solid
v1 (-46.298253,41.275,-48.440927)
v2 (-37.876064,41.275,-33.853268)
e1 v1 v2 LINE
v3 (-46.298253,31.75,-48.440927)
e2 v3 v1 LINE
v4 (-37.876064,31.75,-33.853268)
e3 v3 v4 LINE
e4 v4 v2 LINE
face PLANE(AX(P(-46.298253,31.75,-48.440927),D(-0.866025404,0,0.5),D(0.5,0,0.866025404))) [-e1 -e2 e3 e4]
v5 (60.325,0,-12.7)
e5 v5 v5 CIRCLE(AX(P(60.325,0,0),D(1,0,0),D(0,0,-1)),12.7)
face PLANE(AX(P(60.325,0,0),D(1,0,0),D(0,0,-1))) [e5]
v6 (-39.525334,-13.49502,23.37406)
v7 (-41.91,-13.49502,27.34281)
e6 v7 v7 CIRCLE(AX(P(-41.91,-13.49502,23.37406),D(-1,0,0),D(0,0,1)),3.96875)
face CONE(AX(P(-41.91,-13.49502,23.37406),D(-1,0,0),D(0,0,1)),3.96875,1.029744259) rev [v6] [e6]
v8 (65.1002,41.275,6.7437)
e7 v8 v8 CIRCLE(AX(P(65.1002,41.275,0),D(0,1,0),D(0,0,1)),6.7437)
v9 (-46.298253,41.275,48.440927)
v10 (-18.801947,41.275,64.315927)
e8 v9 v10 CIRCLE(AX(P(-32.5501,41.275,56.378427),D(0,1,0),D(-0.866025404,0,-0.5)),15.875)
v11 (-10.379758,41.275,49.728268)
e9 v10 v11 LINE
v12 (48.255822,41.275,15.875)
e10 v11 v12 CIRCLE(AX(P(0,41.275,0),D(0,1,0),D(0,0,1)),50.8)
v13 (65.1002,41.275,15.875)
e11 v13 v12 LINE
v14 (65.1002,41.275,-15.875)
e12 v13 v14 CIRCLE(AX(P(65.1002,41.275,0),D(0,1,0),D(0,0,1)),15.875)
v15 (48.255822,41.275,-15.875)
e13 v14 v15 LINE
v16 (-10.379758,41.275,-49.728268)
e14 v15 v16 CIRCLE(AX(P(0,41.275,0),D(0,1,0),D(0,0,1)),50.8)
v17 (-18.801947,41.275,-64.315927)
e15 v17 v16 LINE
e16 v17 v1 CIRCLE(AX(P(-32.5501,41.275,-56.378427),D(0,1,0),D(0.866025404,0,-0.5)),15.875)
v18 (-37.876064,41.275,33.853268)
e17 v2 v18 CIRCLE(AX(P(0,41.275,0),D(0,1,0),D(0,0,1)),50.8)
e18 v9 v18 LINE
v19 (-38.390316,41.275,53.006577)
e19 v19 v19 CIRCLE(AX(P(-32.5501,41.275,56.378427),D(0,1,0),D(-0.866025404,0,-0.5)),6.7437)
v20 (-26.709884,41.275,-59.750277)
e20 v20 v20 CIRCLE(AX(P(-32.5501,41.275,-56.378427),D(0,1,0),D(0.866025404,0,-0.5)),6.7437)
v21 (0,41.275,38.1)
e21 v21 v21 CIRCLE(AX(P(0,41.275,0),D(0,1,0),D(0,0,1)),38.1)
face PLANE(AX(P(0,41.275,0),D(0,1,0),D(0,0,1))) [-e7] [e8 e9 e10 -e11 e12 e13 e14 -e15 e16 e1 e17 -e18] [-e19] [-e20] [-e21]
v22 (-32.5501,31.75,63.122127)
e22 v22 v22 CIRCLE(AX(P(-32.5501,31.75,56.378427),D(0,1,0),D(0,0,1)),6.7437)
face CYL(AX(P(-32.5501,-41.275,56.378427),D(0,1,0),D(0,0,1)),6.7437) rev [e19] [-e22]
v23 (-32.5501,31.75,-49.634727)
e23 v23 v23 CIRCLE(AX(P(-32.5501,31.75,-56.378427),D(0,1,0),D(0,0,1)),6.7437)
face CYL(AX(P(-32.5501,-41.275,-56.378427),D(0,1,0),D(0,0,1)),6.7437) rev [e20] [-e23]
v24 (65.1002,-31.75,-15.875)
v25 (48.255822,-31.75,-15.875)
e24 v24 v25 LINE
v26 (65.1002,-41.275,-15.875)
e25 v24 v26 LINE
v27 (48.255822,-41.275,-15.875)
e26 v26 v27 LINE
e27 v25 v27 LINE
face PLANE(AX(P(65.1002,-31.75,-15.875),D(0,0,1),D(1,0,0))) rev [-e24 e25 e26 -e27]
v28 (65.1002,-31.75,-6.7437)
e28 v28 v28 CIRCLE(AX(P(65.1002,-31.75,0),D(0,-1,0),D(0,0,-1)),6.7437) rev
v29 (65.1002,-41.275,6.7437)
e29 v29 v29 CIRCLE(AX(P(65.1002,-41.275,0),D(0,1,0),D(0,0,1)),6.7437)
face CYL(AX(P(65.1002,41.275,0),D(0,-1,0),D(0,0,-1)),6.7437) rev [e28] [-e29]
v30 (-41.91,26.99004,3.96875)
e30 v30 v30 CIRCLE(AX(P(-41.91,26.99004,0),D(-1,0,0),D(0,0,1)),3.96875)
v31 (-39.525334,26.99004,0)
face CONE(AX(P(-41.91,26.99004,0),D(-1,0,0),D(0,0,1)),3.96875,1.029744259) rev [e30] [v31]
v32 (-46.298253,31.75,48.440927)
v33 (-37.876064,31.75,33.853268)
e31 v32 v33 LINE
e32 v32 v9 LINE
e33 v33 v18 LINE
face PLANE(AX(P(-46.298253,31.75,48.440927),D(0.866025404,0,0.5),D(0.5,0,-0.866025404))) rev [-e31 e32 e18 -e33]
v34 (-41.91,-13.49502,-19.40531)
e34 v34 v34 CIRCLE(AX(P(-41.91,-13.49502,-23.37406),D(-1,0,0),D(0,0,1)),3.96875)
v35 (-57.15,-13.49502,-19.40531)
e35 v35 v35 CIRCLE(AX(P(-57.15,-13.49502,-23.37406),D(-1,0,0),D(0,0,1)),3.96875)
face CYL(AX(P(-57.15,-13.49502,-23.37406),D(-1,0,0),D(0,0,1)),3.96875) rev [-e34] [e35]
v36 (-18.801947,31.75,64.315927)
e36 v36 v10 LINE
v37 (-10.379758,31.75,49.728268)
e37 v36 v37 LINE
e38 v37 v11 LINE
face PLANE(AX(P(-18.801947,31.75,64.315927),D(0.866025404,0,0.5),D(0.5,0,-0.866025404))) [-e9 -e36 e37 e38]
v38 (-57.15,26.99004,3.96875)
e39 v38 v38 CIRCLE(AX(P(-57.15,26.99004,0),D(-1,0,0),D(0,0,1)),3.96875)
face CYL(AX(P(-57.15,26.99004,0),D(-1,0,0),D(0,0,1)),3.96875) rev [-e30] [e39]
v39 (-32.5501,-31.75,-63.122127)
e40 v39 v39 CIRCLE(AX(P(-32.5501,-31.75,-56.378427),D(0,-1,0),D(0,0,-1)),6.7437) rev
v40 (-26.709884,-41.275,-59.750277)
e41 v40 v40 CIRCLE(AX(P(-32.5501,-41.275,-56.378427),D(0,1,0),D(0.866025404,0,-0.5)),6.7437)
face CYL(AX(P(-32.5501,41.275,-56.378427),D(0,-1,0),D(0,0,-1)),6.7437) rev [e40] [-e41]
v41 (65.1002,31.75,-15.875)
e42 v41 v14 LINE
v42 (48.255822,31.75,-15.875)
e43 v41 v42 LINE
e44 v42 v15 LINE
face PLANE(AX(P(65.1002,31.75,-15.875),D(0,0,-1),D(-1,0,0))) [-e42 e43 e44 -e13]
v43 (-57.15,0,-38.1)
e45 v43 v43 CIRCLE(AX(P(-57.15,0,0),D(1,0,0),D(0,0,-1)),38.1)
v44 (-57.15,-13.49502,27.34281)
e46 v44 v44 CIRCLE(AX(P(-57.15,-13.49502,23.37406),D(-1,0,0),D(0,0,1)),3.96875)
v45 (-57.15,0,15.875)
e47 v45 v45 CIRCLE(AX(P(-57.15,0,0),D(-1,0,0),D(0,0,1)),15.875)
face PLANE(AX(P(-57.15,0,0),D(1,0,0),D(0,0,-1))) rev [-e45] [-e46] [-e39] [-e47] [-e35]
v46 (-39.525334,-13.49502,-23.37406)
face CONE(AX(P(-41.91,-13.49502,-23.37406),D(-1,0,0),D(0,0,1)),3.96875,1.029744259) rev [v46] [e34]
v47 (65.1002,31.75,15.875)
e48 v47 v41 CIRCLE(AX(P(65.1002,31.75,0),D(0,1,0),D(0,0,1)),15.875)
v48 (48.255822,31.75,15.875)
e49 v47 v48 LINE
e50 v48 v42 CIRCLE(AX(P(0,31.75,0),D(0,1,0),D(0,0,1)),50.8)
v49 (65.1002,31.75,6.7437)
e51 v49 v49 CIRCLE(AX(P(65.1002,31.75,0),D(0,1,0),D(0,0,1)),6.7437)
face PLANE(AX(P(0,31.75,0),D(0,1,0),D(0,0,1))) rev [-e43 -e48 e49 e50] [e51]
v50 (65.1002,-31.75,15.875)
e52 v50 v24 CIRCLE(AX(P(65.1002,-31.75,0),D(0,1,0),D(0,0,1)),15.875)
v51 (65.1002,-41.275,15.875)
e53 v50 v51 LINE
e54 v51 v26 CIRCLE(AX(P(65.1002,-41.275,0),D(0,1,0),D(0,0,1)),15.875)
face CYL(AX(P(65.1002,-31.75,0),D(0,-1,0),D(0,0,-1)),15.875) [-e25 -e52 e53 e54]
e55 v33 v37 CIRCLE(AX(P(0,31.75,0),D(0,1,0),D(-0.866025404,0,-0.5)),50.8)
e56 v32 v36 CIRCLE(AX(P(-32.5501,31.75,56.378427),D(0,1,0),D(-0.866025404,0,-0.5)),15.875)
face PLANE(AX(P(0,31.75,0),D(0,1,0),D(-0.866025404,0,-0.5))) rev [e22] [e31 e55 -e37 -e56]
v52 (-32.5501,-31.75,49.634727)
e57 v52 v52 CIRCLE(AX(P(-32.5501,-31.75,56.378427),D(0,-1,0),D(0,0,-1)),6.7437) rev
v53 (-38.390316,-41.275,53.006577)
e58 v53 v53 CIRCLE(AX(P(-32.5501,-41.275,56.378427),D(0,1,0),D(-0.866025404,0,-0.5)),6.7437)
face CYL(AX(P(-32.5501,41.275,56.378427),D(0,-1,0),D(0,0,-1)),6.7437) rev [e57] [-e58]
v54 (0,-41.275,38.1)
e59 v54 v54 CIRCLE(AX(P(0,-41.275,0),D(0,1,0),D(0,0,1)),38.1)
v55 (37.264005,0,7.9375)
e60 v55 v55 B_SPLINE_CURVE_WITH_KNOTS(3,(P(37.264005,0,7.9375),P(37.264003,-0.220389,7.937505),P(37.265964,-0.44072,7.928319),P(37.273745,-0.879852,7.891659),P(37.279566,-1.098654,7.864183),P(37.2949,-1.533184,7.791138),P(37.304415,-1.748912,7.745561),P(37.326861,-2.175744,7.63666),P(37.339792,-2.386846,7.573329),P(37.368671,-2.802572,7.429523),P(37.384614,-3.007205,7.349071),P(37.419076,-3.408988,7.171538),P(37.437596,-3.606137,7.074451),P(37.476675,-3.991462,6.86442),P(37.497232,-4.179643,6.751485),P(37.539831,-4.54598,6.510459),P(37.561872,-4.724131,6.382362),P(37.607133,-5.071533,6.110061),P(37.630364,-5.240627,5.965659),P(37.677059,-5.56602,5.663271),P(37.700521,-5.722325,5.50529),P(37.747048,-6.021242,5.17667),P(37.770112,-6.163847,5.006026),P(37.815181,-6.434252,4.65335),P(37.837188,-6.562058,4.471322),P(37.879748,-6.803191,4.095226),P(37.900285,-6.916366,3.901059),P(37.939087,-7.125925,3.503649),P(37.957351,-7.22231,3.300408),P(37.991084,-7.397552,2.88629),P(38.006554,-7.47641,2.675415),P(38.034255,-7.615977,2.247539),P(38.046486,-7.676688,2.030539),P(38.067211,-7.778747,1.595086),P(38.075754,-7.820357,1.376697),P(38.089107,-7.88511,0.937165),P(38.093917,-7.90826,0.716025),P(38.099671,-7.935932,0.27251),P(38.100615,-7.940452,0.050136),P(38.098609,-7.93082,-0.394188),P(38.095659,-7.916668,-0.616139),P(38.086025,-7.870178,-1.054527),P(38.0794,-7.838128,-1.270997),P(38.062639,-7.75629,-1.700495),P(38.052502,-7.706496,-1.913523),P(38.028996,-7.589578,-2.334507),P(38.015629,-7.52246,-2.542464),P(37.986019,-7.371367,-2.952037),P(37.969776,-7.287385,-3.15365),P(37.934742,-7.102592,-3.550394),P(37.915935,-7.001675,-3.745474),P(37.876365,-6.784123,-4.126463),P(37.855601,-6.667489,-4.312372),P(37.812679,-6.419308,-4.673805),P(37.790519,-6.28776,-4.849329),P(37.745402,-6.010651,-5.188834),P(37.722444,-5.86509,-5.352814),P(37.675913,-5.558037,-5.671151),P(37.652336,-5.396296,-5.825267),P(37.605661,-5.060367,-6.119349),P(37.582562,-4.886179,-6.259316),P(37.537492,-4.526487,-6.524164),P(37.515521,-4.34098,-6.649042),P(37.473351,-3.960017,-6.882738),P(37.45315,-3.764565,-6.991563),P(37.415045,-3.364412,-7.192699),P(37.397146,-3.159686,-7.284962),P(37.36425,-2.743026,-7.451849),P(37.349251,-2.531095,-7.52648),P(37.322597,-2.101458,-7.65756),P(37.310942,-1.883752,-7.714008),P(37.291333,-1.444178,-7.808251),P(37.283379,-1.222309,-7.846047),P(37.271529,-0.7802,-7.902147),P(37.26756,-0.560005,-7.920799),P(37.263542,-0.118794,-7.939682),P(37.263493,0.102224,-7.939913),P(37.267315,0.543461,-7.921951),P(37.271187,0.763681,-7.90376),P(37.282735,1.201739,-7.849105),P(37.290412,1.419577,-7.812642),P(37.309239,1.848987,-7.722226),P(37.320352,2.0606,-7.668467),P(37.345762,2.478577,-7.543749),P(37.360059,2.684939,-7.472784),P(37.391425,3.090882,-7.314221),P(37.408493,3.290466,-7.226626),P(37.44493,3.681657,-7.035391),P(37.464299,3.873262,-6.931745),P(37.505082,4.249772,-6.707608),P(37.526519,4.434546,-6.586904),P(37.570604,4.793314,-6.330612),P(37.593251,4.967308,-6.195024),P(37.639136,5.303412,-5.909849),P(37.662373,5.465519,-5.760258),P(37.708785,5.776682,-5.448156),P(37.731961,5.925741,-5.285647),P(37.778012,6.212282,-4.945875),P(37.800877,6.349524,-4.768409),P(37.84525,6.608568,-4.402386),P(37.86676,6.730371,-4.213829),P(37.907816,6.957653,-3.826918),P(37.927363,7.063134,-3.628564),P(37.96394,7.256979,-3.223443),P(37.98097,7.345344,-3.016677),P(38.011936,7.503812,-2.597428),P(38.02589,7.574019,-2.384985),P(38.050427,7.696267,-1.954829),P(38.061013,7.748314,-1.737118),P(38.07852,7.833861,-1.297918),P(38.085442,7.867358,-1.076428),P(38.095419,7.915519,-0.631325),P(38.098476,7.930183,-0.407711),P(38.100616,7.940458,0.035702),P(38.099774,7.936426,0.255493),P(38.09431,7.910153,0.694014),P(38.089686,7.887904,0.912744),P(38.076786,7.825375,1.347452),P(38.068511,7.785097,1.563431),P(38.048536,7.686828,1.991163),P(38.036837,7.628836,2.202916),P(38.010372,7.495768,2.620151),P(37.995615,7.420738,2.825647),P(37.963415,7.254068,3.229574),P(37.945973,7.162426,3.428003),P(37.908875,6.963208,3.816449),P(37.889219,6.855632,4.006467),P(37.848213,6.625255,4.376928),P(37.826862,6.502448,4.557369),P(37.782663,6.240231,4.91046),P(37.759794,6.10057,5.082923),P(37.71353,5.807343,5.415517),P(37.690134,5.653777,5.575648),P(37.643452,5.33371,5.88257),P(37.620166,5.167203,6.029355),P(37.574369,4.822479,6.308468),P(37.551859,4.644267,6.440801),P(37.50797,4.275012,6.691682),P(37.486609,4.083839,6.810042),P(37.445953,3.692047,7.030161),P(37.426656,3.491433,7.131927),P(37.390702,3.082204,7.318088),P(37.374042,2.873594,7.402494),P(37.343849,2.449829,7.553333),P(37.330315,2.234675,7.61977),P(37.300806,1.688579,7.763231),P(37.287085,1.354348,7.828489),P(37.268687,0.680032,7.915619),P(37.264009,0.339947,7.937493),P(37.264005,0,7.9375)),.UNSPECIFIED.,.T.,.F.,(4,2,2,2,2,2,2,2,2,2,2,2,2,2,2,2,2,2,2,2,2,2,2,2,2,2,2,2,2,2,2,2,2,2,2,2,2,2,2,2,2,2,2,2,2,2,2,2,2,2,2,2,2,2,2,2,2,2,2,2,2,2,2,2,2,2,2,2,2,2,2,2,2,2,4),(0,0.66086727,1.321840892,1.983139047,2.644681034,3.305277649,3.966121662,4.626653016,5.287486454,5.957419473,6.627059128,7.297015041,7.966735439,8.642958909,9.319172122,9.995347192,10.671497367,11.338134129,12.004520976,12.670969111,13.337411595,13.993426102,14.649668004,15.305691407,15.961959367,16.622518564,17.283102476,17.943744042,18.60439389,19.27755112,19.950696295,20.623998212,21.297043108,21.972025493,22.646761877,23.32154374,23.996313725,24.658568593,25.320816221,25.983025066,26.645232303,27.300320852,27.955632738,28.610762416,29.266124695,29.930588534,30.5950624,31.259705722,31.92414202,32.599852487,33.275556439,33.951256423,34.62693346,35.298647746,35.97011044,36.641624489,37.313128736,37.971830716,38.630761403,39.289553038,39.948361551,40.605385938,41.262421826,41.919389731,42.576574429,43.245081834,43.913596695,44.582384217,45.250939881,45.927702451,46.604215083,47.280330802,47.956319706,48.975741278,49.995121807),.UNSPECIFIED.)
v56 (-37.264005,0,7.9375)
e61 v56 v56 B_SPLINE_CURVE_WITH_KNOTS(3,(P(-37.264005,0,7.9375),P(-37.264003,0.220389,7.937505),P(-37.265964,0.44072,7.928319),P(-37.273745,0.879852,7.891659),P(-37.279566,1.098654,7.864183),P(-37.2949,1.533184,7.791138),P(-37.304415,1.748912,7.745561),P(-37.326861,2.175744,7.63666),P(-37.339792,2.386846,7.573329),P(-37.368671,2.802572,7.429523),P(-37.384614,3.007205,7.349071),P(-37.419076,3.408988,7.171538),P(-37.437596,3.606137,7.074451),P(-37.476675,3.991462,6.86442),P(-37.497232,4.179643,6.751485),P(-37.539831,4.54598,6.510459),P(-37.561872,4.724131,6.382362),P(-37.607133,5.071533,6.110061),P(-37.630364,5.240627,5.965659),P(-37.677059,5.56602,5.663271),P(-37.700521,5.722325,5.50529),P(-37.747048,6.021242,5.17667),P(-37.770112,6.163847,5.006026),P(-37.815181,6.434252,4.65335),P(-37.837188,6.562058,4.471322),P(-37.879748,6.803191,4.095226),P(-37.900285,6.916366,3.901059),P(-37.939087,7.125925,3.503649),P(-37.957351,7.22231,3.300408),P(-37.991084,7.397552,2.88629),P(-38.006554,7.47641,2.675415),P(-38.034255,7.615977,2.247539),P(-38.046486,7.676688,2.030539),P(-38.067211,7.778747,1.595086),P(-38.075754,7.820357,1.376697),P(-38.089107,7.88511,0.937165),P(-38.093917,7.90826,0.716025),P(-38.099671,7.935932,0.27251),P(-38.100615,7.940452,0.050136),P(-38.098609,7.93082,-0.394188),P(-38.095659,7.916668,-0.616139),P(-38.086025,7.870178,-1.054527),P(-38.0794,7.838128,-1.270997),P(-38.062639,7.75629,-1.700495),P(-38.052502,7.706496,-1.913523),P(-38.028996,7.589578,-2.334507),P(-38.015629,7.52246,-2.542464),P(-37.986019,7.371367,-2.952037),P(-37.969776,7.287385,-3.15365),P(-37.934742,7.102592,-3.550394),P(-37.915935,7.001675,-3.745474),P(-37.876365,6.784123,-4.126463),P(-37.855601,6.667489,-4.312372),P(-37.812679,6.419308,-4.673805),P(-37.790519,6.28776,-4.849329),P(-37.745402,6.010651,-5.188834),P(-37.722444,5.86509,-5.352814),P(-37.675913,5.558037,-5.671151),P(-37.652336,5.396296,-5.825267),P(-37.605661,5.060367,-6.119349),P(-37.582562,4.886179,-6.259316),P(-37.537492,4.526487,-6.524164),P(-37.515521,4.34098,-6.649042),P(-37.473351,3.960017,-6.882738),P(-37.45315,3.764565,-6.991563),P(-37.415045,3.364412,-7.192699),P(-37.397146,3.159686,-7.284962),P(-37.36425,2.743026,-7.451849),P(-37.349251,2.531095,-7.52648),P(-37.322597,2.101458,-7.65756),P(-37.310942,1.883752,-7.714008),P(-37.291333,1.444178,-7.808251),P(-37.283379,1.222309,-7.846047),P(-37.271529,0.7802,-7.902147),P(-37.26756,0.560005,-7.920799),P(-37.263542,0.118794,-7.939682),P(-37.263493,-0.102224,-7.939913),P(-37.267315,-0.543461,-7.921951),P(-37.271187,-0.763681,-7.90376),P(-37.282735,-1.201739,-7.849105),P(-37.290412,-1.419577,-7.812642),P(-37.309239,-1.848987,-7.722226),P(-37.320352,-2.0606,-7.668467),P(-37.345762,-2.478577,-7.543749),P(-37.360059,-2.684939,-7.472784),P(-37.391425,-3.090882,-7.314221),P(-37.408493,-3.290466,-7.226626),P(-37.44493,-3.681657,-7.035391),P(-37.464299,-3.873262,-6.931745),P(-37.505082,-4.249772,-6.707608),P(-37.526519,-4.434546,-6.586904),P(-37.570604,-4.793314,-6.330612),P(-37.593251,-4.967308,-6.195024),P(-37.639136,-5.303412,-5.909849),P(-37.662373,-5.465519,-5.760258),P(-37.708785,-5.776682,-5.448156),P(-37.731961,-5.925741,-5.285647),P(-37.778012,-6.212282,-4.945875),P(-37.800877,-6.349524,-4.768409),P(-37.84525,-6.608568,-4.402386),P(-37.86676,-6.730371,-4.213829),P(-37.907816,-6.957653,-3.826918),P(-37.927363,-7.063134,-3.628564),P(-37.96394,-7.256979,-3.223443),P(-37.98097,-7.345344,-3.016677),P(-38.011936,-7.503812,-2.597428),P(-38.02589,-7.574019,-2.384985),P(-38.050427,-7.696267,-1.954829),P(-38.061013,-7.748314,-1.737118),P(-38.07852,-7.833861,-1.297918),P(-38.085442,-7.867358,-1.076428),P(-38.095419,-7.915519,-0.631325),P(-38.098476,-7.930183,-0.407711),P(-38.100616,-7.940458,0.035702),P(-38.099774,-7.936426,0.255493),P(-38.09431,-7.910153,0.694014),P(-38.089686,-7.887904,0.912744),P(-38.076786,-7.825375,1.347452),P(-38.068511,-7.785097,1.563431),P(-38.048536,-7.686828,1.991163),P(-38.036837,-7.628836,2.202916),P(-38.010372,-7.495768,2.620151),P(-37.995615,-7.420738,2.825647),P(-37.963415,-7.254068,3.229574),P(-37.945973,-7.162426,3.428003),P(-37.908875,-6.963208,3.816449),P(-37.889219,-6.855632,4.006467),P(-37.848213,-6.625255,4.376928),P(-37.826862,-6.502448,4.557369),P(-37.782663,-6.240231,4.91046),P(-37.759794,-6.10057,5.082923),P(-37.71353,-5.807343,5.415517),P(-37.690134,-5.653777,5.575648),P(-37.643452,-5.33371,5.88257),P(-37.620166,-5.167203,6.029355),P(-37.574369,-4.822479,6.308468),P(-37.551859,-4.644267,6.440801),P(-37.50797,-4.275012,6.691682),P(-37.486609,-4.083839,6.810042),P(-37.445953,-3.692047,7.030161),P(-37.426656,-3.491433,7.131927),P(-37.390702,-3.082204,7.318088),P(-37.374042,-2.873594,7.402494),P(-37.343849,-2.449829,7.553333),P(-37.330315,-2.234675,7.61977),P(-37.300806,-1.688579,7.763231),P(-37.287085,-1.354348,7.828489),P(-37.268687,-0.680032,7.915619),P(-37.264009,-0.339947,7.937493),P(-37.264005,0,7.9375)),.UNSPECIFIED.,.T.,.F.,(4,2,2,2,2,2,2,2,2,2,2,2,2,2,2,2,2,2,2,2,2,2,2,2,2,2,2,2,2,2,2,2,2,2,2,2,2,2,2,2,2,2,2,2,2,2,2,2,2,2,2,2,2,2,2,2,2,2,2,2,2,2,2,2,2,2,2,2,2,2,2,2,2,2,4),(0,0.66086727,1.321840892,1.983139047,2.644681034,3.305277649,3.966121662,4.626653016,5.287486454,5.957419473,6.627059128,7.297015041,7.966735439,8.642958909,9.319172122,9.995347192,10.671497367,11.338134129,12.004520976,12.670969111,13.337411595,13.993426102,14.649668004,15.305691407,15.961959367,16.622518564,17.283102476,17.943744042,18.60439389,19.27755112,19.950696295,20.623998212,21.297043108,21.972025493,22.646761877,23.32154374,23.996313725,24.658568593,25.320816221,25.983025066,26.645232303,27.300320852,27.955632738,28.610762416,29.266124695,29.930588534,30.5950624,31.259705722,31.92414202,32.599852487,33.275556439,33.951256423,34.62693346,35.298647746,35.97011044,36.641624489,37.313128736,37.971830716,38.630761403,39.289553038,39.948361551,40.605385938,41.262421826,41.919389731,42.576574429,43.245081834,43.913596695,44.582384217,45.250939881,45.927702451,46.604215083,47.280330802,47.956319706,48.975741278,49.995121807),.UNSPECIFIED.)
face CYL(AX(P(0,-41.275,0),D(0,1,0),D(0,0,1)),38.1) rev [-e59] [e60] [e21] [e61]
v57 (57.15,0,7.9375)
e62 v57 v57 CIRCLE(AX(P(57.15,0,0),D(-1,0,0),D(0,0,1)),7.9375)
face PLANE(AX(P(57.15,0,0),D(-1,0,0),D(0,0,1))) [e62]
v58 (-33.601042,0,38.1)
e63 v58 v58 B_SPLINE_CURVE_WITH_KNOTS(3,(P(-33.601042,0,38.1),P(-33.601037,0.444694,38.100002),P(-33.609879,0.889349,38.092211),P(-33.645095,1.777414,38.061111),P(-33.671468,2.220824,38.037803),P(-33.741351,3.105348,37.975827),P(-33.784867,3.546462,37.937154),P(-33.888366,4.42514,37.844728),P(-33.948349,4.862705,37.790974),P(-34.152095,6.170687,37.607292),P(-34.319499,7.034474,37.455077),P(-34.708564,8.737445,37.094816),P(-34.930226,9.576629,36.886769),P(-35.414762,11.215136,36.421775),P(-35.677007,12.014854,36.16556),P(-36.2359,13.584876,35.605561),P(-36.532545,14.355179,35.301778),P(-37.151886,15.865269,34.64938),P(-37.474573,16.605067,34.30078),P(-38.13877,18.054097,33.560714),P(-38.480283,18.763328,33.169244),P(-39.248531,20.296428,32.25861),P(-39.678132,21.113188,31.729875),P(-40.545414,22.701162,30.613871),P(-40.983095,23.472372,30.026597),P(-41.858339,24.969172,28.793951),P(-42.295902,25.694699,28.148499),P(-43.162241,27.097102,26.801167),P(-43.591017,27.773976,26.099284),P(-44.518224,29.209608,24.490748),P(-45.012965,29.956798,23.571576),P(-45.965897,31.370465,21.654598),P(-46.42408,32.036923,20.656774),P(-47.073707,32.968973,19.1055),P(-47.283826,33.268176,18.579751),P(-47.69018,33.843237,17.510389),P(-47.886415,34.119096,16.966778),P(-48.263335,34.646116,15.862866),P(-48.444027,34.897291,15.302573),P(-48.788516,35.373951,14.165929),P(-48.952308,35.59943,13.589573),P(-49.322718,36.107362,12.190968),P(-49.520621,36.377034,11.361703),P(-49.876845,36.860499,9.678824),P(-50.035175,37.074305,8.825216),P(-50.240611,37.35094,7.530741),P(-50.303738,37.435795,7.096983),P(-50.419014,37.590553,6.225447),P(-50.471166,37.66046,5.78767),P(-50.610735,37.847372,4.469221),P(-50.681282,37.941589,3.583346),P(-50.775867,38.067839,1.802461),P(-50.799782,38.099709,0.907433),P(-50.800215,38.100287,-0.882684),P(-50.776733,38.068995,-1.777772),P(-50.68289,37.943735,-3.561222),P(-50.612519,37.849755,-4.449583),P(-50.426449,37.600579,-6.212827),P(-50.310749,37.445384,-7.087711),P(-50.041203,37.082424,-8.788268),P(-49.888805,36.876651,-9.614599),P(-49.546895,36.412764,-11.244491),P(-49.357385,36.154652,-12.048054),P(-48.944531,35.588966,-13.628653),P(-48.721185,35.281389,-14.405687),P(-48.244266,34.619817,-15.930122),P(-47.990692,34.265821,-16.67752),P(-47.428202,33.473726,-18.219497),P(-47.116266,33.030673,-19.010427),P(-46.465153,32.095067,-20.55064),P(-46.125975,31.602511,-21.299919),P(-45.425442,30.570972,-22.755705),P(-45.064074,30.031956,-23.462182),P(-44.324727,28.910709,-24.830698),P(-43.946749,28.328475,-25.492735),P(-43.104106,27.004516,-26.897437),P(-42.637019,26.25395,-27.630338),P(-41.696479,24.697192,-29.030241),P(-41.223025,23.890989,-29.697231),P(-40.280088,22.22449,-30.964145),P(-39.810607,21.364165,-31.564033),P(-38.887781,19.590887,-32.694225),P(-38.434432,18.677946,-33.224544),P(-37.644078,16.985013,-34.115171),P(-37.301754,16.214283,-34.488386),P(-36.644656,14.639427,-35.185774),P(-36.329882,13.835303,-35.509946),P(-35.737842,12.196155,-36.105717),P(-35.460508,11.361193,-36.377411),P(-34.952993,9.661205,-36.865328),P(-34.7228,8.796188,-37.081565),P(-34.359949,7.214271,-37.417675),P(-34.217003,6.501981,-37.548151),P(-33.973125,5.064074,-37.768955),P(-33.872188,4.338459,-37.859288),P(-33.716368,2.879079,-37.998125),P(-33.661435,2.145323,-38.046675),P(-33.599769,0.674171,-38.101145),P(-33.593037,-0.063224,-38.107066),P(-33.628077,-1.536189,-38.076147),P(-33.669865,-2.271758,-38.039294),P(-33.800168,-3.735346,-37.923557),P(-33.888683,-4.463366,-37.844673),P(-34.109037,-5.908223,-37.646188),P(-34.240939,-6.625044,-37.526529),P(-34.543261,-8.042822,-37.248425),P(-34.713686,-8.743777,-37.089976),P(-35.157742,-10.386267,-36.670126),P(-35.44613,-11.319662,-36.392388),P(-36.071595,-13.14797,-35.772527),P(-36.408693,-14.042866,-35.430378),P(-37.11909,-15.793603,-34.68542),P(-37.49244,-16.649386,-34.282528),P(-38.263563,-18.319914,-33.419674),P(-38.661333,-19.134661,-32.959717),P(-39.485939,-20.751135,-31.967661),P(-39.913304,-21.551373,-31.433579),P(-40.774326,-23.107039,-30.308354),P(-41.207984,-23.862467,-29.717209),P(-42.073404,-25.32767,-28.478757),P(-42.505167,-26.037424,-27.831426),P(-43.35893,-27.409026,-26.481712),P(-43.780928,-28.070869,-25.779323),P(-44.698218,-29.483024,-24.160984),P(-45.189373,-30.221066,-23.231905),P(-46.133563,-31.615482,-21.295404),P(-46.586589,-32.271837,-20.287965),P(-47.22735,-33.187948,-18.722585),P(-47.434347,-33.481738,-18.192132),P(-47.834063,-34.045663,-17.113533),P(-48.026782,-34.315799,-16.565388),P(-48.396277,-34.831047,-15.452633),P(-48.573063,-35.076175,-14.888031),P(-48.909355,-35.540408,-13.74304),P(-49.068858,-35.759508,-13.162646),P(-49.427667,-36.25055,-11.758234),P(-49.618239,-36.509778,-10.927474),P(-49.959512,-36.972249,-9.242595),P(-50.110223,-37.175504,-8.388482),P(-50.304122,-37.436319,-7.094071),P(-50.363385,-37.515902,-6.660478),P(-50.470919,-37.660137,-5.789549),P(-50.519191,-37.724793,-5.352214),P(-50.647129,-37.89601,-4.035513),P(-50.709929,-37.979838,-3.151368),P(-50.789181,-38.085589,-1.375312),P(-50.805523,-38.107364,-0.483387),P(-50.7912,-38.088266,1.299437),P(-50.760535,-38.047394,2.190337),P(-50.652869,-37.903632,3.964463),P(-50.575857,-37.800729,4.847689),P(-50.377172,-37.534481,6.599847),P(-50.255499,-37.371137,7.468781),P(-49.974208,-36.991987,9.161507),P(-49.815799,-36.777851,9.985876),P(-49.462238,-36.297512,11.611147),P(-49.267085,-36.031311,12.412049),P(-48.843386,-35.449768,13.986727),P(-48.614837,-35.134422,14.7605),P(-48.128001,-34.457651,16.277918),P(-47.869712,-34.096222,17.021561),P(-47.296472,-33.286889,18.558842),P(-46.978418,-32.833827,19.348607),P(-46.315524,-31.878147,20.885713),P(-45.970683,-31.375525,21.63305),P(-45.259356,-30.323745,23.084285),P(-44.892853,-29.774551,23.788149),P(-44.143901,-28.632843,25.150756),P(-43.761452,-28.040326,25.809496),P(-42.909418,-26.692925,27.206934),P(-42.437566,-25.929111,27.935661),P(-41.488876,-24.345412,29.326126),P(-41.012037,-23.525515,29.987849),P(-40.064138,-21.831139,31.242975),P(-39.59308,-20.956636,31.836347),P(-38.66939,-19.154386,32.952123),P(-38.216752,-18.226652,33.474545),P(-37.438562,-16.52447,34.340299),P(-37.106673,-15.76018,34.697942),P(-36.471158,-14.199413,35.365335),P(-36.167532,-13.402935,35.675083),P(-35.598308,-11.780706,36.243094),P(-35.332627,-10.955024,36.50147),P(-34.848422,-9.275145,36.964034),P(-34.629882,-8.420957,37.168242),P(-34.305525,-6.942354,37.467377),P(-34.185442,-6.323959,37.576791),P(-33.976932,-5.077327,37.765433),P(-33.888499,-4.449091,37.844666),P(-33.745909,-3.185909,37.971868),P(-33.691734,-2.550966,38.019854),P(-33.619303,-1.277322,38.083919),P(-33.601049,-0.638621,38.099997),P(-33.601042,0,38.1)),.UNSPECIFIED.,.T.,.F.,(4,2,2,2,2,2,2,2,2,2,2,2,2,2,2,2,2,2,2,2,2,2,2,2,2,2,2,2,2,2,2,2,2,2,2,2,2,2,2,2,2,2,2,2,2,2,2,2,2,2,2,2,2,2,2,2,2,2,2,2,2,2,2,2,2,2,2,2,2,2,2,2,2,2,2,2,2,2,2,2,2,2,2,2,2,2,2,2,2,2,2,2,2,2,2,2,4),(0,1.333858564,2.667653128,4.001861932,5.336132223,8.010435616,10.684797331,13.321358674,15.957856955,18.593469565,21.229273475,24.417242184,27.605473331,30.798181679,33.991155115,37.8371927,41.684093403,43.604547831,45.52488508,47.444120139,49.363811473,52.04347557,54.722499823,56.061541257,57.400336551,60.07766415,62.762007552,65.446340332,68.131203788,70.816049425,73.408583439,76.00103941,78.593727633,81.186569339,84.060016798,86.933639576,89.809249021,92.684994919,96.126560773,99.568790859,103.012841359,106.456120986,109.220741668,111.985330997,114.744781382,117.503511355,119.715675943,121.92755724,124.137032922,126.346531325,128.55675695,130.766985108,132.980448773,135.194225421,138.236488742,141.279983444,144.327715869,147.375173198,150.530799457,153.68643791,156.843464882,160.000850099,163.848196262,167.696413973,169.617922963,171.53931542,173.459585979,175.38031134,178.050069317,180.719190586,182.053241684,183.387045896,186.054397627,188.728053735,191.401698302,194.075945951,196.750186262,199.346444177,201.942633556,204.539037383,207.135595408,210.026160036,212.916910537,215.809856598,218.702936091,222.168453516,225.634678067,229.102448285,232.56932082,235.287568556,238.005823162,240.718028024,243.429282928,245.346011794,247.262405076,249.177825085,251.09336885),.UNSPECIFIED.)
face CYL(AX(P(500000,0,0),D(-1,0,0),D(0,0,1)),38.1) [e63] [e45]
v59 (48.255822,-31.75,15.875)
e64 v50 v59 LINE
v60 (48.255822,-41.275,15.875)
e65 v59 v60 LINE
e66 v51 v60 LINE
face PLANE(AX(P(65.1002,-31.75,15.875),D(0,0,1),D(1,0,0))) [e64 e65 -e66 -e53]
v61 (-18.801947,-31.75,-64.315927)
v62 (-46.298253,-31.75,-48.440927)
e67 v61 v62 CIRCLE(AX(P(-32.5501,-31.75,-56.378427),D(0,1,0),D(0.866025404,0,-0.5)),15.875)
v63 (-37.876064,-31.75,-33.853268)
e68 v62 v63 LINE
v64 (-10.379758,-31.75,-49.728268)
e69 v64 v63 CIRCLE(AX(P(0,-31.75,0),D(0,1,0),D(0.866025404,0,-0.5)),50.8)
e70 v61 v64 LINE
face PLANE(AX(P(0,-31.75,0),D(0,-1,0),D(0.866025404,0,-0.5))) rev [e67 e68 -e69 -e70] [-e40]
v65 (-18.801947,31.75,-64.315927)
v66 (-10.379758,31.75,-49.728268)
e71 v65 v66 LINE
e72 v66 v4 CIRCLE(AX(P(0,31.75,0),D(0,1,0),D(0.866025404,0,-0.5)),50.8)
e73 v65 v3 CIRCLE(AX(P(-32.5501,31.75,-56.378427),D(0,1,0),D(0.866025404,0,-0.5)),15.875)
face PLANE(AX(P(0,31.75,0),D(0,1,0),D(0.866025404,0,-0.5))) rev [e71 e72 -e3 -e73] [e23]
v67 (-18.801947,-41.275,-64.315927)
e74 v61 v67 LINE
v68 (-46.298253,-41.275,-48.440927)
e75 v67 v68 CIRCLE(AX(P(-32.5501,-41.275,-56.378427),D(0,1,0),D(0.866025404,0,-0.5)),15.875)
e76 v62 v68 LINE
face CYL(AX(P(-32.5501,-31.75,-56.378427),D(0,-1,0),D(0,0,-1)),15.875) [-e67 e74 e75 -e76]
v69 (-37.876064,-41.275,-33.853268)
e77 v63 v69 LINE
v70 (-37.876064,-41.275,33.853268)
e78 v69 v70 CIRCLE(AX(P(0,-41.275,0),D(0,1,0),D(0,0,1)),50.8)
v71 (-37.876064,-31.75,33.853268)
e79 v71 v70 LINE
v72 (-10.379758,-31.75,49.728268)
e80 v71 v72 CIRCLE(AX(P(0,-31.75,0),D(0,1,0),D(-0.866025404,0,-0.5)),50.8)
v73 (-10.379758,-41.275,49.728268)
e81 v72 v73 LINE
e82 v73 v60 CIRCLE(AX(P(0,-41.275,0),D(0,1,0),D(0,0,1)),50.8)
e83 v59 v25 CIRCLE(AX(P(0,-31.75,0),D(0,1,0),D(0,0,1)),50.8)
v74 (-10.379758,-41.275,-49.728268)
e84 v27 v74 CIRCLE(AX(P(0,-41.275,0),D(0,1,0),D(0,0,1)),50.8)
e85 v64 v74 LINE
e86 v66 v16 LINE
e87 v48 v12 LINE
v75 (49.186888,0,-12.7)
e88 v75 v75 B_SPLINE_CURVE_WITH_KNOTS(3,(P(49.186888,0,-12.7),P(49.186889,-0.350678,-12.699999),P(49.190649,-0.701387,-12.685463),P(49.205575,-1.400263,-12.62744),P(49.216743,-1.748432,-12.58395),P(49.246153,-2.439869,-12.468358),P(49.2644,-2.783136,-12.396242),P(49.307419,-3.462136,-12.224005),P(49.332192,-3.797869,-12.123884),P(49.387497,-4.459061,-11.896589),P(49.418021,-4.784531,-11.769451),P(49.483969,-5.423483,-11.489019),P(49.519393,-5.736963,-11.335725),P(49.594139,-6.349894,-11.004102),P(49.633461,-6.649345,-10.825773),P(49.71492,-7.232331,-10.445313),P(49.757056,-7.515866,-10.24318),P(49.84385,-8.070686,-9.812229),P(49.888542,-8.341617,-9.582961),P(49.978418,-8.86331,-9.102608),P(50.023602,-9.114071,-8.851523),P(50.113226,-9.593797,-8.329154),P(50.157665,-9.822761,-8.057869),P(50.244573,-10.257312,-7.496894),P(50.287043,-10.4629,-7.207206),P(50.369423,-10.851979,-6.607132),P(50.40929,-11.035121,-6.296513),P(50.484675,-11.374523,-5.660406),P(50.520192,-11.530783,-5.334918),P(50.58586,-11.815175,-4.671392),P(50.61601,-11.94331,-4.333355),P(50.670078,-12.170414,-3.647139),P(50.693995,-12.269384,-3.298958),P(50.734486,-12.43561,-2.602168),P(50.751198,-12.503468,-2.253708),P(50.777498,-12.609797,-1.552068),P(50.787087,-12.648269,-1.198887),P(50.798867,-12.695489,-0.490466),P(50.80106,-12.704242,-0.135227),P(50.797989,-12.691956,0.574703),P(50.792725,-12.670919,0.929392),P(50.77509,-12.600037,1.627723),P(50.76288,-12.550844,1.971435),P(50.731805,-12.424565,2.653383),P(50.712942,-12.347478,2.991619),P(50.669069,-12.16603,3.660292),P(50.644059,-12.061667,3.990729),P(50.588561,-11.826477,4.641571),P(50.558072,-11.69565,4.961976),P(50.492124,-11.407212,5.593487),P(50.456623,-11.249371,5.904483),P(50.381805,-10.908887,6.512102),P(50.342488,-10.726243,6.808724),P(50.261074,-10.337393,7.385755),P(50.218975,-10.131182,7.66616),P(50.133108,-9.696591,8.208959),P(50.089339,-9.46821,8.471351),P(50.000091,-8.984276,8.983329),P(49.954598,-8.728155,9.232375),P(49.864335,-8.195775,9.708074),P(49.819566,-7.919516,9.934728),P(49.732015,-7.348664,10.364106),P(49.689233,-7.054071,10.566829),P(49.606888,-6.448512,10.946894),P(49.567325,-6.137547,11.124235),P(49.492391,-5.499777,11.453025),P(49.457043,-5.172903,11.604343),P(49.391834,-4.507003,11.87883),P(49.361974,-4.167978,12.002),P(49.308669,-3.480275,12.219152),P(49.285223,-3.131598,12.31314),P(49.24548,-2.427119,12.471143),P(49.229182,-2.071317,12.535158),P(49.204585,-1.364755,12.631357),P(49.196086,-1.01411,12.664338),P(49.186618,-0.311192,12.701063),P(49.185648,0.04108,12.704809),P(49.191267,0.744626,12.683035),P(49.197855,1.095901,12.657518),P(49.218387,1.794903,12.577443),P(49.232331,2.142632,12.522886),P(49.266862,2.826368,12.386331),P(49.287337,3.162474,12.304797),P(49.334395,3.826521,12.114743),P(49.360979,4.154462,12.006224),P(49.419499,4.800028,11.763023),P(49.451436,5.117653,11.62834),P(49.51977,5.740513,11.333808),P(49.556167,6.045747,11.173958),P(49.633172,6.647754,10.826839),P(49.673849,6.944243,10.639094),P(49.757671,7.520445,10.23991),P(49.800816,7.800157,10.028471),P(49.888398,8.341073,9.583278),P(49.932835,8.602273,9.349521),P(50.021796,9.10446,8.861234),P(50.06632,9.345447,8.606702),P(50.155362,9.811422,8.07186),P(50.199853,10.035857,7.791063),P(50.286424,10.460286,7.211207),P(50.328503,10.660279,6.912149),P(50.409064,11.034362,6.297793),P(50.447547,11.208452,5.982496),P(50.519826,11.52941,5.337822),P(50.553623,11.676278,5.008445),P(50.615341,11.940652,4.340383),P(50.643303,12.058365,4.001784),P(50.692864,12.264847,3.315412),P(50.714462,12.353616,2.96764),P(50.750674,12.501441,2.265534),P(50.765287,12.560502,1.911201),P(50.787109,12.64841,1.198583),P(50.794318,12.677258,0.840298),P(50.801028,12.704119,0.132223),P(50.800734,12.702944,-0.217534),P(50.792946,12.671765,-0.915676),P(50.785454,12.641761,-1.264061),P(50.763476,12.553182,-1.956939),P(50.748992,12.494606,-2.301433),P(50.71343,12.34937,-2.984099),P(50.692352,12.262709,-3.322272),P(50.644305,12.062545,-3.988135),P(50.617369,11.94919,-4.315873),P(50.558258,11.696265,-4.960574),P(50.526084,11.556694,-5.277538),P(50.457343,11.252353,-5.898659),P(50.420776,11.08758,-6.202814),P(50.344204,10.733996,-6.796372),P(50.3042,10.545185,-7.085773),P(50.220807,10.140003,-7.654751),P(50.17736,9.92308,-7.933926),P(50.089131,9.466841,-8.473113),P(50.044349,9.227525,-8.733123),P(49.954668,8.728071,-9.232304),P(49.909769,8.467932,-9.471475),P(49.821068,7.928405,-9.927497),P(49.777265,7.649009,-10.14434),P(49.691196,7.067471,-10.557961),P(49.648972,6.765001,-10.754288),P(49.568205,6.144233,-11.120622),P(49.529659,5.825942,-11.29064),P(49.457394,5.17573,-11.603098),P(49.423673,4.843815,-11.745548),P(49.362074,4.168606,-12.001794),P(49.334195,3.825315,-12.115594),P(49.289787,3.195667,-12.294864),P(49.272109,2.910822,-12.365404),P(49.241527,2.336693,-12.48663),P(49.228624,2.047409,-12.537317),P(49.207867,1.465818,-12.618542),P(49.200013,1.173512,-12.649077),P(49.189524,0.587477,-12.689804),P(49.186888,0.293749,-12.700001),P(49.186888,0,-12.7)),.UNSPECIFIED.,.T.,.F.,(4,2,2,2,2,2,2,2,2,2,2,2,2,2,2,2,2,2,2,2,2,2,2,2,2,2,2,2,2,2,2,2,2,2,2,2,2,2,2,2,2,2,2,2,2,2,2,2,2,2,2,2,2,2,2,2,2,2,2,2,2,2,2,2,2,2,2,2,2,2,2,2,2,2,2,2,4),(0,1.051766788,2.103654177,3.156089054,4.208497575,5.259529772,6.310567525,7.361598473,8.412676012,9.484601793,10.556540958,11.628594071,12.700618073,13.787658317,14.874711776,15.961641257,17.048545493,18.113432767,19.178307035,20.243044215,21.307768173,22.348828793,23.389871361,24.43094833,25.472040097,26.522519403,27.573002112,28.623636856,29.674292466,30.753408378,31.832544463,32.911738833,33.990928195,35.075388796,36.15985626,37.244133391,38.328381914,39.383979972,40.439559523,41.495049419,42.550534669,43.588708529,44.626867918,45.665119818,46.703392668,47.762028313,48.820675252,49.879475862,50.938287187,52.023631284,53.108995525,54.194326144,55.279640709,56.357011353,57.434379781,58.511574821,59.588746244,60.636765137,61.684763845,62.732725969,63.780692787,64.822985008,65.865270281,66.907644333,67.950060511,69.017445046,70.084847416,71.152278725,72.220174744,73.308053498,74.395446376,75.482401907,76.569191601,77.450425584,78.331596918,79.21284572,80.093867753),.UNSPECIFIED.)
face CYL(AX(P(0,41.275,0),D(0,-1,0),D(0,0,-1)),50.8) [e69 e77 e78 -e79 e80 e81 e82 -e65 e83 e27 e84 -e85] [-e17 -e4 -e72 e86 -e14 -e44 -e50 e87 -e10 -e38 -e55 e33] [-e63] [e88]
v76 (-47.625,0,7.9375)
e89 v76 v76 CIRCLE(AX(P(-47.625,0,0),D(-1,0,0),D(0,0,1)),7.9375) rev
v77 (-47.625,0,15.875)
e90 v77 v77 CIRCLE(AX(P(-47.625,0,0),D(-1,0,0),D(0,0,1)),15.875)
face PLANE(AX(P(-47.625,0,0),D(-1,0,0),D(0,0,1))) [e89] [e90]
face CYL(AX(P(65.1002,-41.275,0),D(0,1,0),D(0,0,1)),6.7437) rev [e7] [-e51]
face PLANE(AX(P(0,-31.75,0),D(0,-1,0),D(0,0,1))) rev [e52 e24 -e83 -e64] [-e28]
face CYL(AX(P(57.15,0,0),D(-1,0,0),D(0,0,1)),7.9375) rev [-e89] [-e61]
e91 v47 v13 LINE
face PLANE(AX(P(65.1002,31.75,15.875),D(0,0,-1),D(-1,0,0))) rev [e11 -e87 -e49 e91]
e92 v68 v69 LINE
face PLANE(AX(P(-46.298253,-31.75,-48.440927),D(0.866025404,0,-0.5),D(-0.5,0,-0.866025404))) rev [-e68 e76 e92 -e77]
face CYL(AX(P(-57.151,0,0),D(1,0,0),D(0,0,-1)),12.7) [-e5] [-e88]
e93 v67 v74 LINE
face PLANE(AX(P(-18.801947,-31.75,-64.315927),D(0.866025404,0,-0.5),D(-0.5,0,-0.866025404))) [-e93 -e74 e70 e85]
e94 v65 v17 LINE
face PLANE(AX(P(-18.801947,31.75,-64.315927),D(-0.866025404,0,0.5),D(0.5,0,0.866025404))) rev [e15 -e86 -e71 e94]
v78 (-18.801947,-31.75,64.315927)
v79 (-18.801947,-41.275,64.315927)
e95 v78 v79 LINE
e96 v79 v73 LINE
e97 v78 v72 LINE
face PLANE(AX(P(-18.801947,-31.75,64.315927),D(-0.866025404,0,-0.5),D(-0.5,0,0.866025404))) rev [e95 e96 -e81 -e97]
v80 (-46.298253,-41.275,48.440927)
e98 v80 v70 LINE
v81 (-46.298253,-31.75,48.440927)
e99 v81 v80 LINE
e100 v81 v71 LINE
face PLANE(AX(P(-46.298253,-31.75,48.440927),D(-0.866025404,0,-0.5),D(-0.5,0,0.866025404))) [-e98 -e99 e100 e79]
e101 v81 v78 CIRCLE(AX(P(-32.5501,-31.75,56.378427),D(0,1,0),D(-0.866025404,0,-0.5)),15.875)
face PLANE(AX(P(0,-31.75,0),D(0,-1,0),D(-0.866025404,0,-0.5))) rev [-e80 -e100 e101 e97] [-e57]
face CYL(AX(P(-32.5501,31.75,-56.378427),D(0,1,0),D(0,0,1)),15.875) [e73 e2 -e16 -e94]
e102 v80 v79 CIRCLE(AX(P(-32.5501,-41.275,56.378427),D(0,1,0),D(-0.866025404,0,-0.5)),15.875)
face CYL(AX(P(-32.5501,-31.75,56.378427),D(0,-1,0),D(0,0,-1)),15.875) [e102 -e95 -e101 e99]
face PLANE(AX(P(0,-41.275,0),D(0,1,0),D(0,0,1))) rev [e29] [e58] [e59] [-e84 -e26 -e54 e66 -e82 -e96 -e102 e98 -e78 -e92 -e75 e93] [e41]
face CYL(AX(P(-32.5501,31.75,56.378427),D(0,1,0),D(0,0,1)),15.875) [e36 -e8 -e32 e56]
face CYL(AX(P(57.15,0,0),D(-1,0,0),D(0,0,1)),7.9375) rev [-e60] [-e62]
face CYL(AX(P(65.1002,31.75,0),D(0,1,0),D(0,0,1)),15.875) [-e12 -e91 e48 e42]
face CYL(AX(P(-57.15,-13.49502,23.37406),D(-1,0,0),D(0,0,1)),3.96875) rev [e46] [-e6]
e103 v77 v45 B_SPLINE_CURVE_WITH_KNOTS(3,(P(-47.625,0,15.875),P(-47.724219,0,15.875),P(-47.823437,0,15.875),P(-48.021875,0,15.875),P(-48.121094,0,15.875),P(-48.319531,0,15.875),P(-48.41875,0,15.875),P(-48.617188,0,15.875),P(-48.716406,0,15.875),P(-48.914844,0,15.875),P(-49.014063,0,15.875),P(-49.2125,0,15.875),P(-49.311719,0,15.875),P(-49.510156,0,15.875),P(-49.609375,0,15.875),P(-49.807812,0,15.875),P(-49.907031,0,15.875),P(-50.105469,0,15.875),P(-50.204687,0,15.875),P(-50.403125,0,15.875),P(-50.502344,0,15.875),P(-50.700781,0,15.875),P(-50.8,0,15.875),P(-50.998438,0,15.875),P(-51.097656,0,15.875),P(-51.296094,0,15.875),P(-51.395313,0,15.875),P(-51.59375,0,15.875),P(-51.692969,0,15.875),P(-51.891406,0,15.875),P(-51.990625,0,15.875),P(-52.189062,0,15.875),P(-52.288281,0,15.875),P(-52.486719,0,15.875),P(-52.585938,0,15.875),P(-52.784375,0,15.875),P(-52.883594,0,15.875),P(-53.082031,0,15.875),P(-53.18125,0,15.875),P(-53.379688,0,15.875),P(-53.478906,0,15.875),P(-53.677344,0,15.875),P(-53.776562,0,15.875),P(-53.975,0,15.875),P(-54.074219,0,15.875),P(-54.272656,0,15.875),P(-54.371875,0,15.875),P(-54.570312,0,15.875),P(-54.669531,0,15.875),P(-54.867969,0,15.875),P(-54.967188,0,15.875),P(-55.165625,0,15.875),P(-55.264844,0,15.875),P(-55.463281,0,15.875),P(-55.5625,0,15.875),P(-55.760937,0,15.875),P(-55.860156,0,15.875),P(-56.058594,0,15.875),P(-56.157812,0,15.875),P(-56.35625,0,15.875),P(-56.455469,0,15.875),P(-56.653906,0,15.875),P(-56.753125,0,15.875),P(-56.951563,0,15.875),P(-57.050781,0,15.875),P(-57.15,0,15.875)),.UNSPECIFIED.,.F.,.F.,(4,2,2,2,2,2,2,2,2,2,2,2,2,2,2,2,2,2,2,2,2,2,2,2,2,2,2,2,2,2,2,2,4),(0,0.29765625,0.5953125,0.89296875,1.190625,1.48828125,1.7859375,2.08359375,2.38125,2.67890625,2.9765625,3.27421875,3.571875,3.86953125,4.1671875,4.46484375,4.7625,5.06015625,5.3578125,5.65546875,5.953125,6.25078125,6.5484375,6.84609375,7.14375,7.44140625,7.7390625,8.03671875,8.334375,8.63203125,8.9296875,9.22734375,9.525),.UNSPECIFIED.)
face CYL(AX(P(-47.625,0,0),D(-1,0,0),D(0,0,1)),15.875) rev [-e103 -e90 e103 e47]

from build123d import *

# Parameters (mm, degrees)
SKETCH1_R                   = 50.8
OUTSIDE_CYLINDER_DEPTH      = 41.275
BORE_START                  = -41.275
BORE_OUTLINE_R              = 38.1
BORE_DEPTH                  = 82.55
TAB_DEPTH                   = 9.525
TAB_HOLE_START              = 31.75
TAB_HOLE_OUTLINE_R          = 6.7437
TAB_HOLE_DEPTH              = 9.525
CIRPATTERN1_COUNT           = 3
MIRROR1_COPY_1_DEPTH        = 9.525
MIRROR1_COPY_2_DEPTH        = 9.525
MIRROR1_START               = 31.75
MIRROR1_COPY_3_SKETCH_R     = 6.7437
MIRROR1_COPY_3_DEPTH        = 9.525
MIRROR1_COPY_4_SKETCH_R     = 6.7437
MIRROR1_COPY_4_DEPTH        = 9.525
LEFT_PROTRUSION_REACH       = 163.254
LEFT_PROTRUSION_END_RADIUS  = 50.8
SKETCH5_R                   = 38.1
RIGHT_PROTRUSION_REACH      = 178.433
RIGHT_PROTRUSION_END_RADIUS = 50.8
RIGHT_START                 = 60.325
SKETCH6_R                   = 12.7
NARROW_START                = -57.15
NARROW_HOLE_OUTLINE_R       = 7.9375
NARROW_HOLE_DEPTH           = 114.3
SHALLOW_START               = -57.15
SHALLOW_HOLE_OUTLINE_R      = 15.875
SHALLOW_HOLE_OUTLINE_R_2    = 7.9375
SHALLOW_HOLE_DEPTH          = 9.525
CIRPATTERN2_COUNT           = 3


# Read off the part's stored shape, not the designer's step: Bore, Tab-hole, Narrow Hole, Shallow Hole
with BuildPart() as part:
    # Sketch1 → Outside Cylinder (new, symmetric)
    with BuildSketch(Plane(origin=(0, 0, 0), x_dir=(1, 0, 0), z_dir=(0, 1, 0))):
        with Locations(Location((0, 0, 0), (0, 0, 270))):
            Circle(SKETCH1_R)
    extrude(amount=OUTSIDE_CYLINDER_DEPTH, both=True)

    # Bore outline → Bore (cut)
    with BuildSketch(Plane(origin=(0, 0, 0), x_dir=(1, 0, 0), z_dir=(0, 1, 0)).offset(BORE_START)):
        Circle(BORE_OUTLINE_R)
    extrude(amount=BORE_DEPTH, mode=Mode.SUBTRACT)

    # Sketch3 → tab (add)
    with BuildSketch(Plane(origin=(0, 41.275, 0), x_dir=(1, 0, 0), z_dir=(0, 1, 0))):
        with BuildLine():
            Line((65.1002, 15.875), (48.255822188, 15.875))
            ThreePointArc((48.255822188, 15.875), (50.8, 0), (48.255822188, -15.875))
            Line((48.255822188, -15.875), (65.1002, -15.875))
            ThreePointArc((65.1002, -15.875), (80.9752, 0), (65.1002, 15.875))
        make_face()
    tab = extrude(amount=-TAB_DEPTH)

    # Tab-hole outline → Tab-hole (cut)
    with BuildSketch(Plane(origin=(0, 0, 0), x_dir=(1, 0, 0), z_dir=(0, 1, 0)).offset(TAB_HOLE_START)):
        with Locations((65.1002, 0)):
            Circle(TAB_HOLE_OUTLINE_R)
    tab_hole = extrude(amount=TAB_HOLE_DEPTH, mode=Mode.SUBTRACT)

    # CirPattern1: tab, Tab-hole ×3 about axis
    cirpattern1_axis = Axis((0, 0, 0), (0, 1, 0))
    add([tab.rotate(cirpattern1_axis, i * 360 / CIRPATTERN1_COUNT) for i in range(1, CIRPATTERN1_COUNT)])
    add([tab_hole.rotate(cirpattern1_axis, i * 360 / CIRPATTERN1_COUNT) for i in range(1, CIRPATTERN1_COUNT)], mode=Mode.SUBTRACT)

    # Mirror1: tab, Tab-hole across plane
    add(tab.mirror(Plane.ZX))
    add(tab_hole.mirror(Plane.ZX), mode=Mode.SUBTRACT)

    # Mirror1 copy 1 sketch → Mirror1 copy 1 (add)
    with BuildSketch(Plane(origin=(0, -41.275, 0), x_dir=(-0.4999999999999998, 0, -0.8660254037844387), z_dir=(0, -1, 0))):
        with BuildLine():
            Line((65.1002, -15.875), (48.255822188, -15.875))
            ThreePointArc((48.255822188, -15.875), (50.8, 0), (48.255822188, 15.875))
            Line((48.255822188, 15.875), (65.1002, 15.875))
            ThreePointArc((65.1002, 15.875), (80.9752, 0), (65.1002, -15.875))
        make_face()
    extrude(amount=-MIRROR1_COPY_1_DEPTH)

    # Mirror1 copy 2 sketch → Mirror1 copy 2 (add)
    with BuildSketch(Plane(origin=(0, -41.275, 0), x_dir=(-0.5000000000000004, 0, 0.8660254037844384), z_dir=(0, -1, 0))):
        with BuildLine():
            Line((65.1002, -15.875), (48.255822188, -15.875))
            ThreePointArc((48.255822188, -15.875), (50.8, 0), (48.255822188, 15.875))
            Line((48.255822188, 15.875), (65.1002, 15.875))
            ThreePointArc((65.1002, 15.875), (80.9752, 0), (65.1002, -15.875))
        make_face()
    extrude(amount=-MIRROR1_COPY_2_DEPTH)

    # Mirror1 copy 3 sketch → Mirror1 copy 3 (cut)
    with BuildSketch(Plane(origin=(0, 0, 0), x_dir=(-0.4999999999999998, 0, -0.8660254037844387), z_dir=(0, -1, 0)).offset(MIRROR1_START)):
        with Locations((65.1002, 0)):
            Circle(MIRROR1_COPY_3_SKETCH_R)
    extrude(amount=MIRROR1_COPY_3_DEPTH, mode=Mode.SUBTRACT)

    # Mirror1 copy 4 sketch → Mirror1 copy 4 (cut)
    with BuildSketch(Plane(origin=(0, 0, 0), x_dir=(-0.5000000000000004, 0, 0.8660254037844384), z_dir=(0, -1, 0)).offset(MIRROR1_START)):
        with Locations((65.1002, 0)):
            Circle(MIRROR1_COPY_4_SKETCH_R)
    extrude(amount=MIRROR1_COPY_4_DEPTH, mode=Mode.SUBTRACT)

    # Left Protrusion: up to this cylinder (the profile starts outside it)
    left_protrusion_end = Plane(origin=(0, 0, 0), z_dir=(0, -1, 0)) * Cylinder(LEFT_PROTRUSION_END_RADIUS, 429.108, mode=Mode.PRIVATE)
    # Sketch5 → Left Protrusion (add, up to the surface)
    with BuildSketch(Plane(origin=(-57.15, 0, 0), x_dir=(0, 0, -1), z_dir=(1, 0, 0)), mode=Mode.PRIVATE) as left_protrusion_sk1:
        with Locations(Location((0, 0, 0), (0, 0, 180))):
            Circle(SKETCH5_R)
    left_protrusion_tool1 = extrude(left_protrusion_sk1.sketch, amount=LEFT_PROTRUSION_REACH, mode=Mode.PRIVATE) - left_protrusion_end
    add(left_protrusion_tool1.solids().sort_by_distance((-57.15, 0, 0))[0])

    # Right Protrusion: up to this cylinder (the profile starts outside it)
    right_protrusion_end = Plane(origin=(0, 0, 0), z_dir=(0, -1, 0)) * Cylinder(RIGHT_PROTRUSION_END_RADIUS, 459.466, mode=Mode.PRIVATE)
    # Sketch6 → Right Protrusion (add, up to the surface)
    with BuildSketch(Plane(origin=(0, 0, 0), x_dir=(0, 0, -1), z_dir=(1, 0, 0)).offset(RIGHT_START), mode=Mode.PRIVATE) as right_protrusion_sk1:
        Circle(SKETCH6_R)
    right_protrusion_tool1 = extrude(right_protrusion_sk1.sketch, amount=-RIGHT_PROTRUSION_REACH, mode=Mode.PRIVATE) - right_protrusion_end
    add(right_protrusion_tool1.solids().sort_by_distance((60.325, 0, 0))[0])

    # Narrow Hole outline → Narrow Hole (cut)
    with BuildSketch(Plane.YZ.offset(NARROW_START)):
        Circle(NARROW_HOLE_OUTLINE_R)
    extrude(amount=NARROW_HOLE_DEPTH, mode=Mode.SUBTRACT)

    # Shallow Hole outline → Shallow Hole (cut)
    with BuildSketch(Plane.YZ.offset(SHALLOW_START)):
        Circle(SHALLOW_HOLE_OUTLINE_R)
        Circle(SHALLOW_HOLE_OUTLINE_R_2, mode=Mode.SUBTRACT)
    extrude(amount=SHALLOW_HOLE_DEPTH, mode=Mode.SUBTRACT)

    # Sketch13 → 3/8-16 Tapped Hole2 (revolve, cut)
    with BuildSketch(Plane(origin=(-57.15, -13.49502, 23.374060289), x_dir=(0, 0, 1), z_dir=(0, 1, 0))):
        Polygon((0, 0), (0, 17.624665582), (3.96875, 15.24), (3.96875, 0), align=None)
    f_3_8_16_tapped_hole2 = revolve(axis=Axis((-63.5, -13.49502, 23.374060289), (1, 0, 0)), mode=Mode.SUBTRACT)

    # CirPattern2: 3/8-16 Tapped Hole2 ×3 about axis
    cirpattern2_axis = Axis((0, 0, 0), (1, 0, 0))
    for i in range(1, CIRPATTERN2_COUNT):
        add(f_3_8_16_tapped_hole2.rotate(cirpattern2_axis, i * 360 / CIRPATTERN2_COUNT), mode=Mode.SUBTRACT)


solid = part.part
